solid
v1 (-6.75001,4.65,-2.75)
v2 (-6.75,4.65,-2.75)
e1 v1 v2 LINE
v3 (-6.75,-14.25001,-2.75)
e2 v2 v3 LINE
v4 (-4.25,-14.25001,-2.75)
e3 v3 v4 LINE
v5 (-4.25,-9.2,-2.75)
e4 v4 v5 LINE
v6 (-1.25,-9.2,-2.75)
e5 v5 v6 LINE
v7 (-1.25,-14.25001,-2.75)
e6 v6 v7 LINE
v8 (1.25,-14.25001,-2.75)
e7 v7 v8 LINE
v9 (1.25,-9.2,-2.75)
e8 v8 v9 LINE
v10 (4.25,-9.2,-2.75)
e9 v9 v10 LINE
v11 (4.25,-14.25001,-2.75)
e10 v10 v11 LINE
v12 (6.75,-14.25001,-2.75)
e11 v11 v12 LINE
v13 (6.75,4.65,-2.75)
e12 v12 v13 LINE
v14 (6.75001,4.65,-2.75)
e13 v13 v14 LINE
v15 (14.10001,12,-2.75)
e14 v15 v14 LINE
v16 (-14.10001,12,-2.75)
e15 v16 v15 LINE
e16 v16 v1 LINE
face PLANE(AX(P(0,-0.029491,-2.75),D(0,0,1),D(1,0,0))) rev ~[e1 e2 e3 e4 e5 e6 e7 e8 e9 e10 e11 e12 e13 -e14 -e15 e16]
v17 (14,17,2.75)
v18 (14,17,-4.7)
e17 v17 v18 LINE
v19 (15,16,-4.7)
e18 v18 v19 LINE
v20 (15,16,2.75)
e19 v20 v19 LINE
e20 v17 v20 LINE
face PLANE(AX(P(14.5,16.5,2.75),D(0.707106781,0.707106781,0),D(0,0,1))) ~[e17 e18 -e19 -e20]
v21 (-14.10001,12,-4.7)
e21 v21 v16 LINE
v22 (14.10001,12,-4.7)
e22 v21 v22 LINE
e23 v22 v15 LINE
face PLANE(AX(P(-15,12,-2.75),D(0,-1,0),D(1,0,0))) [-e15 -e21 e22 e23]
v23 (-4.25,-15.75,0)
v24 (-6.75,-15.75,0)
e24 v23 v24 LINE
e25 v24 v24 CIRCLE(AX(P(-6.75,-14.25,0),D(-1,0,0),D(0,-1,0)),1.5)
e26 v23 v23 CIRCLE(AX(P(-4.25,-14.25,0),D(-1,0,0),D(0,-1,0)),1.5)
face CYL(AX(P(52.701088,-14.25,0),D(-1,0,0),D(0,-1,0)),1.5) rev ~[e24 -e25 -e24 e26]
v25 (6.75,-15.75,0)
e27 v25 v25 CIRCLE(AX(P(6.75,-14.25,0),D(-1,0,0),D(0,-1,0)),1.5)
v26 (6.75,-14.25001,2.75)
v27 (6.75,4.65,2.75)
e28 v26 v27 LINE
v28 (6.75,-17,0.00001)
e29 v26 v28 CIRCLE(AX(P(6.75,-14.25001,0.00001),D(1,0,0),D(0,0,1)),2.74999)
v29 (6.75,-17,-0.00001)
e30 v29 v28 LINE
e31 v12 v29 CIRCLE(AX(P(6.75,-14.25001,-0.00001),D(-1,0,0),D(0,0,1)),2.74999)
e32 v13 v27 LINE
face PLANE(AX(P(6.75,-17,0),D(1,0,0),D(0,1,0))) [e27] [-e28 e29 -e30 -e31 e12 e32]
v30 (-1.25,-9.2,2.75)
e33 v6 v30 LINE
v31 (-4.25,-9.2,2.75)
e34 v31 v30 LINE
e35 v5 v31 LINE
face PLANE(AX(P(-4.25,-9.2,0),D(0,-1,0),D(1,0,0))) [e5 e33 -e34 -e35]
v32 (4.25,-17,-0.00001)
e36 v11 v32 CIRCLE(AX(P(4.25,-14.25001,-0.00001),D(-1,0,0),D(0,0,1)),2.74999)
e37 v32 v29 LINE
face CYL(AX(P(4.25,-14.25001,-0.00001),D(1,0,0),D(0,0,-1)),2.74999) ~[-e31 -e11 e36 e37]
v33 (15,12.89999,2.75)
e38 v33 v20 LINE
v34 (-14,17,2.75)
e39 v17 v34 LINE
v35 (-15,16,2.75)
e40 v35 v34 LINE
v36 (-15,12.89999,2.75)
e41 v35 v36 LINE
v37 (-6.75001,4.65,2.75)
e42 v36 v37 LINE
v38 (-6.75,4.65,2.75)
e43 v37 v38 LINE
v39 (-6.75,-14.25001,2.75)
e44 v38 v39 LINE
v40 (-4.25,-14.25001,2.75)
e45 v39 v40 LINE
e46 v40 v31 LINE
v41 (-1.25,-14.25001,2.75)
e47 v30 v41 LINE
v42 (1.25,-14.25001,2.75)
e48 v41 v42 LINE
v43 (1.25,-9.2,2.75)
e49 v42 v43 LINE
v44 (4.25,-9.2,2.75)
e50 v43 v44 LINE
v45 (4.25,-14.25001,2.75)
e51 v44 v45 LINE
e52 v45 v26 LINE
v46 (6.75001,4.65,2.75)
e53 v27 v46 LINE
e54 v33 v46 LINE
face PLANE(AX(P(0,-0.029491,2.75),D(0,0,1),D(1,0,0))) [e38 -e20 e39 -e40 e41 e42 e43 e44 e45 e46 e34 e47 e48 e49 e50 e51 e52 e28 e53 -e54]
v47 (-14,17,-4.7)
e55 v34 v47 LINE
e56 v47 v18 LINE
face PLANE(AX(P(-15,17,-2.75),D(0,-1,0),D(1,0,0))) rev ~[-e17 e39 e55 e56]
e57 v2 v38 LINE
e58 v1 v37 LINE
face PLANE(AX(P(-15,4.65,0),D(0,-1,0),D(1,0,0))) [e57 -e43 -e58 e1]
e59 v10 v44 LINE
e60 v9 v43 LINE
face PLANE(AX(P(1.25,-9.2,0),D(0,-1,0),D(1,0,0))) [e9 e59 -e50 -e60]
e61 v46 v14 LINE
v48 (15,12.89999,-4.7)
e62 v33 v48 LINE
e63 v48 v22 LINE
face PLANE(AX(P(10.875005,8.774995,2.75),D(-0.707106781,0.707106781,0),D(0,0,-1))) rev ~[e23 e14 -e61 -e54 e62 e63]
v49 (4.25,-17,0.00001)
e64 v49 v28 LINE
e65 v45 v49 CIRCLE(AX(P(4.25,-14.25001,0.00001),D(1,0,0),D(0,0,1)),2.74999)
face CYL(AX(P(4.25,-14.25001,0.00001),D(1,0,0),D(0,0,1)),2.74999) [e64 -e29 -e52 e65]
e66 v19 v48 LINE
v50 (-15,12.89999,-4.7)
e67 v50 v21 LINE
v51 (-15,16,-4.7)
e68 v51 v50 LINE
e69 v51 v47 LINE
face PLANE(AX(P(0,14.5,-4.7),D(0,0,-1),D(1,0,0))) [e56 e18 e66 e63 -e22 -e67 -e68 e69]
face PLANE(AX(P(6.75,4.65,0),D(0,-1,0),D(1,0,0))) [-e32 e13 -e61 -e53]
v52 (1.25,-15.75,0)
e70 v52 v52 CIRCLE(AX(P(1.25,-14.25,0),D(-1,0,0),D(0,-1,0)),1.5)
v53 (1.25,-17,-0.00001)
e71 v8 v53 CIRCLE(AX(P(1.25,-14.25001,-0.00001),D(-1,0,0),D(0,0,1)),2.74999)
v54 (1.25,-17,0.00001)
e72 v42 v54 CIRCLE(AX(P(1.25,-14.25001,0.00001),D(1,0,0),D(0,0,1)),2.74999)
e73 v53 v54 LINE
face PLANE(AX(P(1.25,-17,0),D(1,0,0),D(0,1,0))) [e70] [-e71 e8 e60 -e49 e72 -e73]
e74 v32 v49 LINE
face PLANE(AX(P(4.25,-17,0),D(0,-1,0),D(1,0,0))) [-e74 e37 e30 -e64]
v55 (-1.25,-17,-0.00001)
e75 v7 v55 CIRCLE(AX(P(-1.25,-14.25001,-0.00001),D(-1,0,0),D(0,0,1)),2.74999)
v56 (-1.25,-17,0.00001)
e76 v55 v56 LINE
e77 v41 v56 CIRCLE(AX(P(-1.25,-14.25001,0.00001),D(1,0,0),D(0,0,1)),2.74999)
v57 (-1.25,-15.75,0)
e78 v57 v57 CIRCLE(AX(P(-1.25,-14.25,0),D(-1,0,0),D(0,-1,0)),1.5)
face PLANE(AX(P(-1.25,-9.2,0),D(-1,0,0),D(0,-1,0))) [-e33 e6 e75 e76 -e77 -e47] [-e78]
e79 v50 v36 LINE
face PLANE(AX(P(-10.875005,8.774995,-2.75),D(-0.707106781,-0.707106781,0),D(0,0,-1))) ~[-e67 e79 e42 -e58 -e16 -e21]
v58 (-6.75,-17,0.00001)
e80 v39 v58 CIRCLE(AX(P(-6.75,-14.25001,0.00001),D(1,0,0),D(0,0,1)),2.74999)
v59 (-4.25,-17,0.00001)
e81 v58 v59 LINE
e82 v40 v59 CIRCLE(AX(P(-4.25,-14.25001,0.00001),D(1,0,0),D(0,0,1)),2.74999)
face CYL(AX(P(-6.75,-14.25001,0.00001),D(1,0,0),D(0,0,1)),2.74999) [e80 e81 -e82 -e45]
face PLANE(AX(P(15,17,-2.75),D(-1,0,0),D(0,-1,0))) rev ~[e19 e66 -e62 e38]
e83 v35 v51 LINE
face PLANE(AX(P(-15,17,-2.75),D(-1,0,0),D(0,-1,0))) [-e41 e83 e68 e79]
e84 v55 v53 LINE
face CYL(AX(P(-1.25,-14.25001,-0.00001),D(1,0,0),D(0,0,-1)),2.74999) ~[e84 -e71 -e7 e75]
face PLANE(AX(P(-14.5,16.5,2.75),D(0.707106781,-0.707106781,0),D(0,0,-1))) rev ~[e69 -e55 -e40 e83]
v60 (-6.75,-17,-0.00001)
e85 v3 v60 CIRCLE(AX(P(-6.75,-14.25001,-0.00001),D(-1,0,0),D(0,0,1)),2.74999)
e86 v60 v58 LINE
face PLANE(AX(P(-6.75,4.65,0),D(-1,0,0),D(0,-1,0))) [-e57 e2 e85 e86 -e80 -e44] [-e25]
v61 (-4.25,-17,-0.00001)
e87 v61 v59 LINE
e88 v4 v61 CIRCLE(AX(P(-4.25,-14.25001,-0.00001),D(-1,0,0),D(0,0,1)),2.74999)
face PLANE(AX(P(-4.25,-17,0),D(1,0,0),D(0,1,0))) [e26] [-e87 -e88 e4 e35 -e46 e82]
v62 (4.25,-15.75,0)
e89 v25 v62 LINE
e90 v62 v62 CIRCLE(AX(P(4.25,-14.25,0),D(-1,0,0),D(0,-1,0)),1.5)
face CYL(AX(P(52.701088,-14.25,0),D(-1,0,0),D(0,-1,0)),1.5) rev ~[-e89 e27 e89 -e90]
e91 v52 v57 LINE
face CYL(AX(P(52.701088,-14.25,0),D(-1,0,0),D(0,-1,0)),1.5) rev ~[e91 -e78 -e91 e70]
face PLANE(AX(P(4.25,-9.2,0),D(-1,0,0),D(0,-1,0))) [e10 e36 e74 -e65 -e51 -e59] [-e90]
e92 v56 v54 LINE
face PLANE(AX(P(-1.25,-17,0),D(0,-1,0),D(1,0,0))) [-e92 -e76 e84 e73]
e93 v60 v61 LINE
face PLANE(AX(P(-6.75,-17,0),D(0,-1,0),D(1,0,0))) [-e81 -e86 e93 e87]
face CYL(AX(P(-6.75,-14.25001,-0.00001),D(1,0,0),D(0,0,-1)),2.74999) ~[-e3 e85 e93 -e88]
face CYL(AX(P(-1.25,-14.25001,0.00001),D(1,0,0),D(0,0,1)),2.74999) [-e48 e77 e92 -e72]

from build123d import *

# Parameters (mm, degrees)
F1_DEPTH = 2.75
F2_W     = 30
F2_H     = 5
F3_DEPTH = 1.95
F4_SIZE  = 8.24999
F5_SIZE  = 1
F6_R     = 2.74999
F8_D     = 3


# Not quite as in the source:
# - a fillet or chamfer is up to 0.001 mm smaller than in the source, because OpenCascade refuses the exact size


with BuildPart() as f1:
    # F0 (on Top) → F1 (new body, symmetric)
    with BuildSketch(Plane.XY):
        Polygon((-15, 17), (-15, 12), (-15, 4.65), (-6.75, 4.65), (-6.75, -17), (-4.25, -17), (-4.25, -9.2), (-1.25, -9.2), (-1.25, -17), (1.25, -17), (1.25, -9.2), (4.25, -9.2), (4.25, -17), (6.75, -17), (6.75, 4.65), (15, 4.65), (15, 12), (15, 17), align=None)
    extrude(amount=F1_DEPTH, both=True)

    # F2 (on face) → F3 (join)
    with BuildSketch(Plane(origin=(0, 0, -2.75), x_dir=(1, 0, 0), z_dir=(0, 0, -1))):
        with Locations((0, -14.5)):
            Rectangle(F2_W, F2_H)
    extrude(amount=F3_DEPTH)

    # F4 (size 8.25 in the source; OpenCascade refuses exactly that, so slightly less here)
    f4_edges = [f1.edges().sort_by_distance(p)[0] for p in [
        (-15, 4.65, 0),
        (15, 4.65, 0),
    ]]
    chamfer(f4_edges, length=F4_SIZE)

    # F5
    f5_edges = [f1.edges().sort_by_distance(p)[0] for p in [
        (15, 17, -0.975),
        (-15, 17, -0.975),
    ]]
    chamfer(f5_edges, length=F5_SIZE)

    # F6 (radius 2.75 in the source; OpenCascade refuses exactly that, so slightly less here)
    f6_edges = [f1.edges().sort_by_distance(p)[0] for p in [
        (5.5, -17, 2.75),
        (0, -17, 2.75),
        (-5.5, -17, 2.75),
        (5.5, -17, -2.75),
        (0, -17, -2.75),
        (-5.5, -17, -2.75),
    ]]
    fillet(f6_edges, radius=F6_R)

    # F8 (through all)
    with Locations(Plane.YZ.offset(6.75)):
        with Locations((-14.25, 0)):
            Hole(F8_D / 2)


solid = f1.part
